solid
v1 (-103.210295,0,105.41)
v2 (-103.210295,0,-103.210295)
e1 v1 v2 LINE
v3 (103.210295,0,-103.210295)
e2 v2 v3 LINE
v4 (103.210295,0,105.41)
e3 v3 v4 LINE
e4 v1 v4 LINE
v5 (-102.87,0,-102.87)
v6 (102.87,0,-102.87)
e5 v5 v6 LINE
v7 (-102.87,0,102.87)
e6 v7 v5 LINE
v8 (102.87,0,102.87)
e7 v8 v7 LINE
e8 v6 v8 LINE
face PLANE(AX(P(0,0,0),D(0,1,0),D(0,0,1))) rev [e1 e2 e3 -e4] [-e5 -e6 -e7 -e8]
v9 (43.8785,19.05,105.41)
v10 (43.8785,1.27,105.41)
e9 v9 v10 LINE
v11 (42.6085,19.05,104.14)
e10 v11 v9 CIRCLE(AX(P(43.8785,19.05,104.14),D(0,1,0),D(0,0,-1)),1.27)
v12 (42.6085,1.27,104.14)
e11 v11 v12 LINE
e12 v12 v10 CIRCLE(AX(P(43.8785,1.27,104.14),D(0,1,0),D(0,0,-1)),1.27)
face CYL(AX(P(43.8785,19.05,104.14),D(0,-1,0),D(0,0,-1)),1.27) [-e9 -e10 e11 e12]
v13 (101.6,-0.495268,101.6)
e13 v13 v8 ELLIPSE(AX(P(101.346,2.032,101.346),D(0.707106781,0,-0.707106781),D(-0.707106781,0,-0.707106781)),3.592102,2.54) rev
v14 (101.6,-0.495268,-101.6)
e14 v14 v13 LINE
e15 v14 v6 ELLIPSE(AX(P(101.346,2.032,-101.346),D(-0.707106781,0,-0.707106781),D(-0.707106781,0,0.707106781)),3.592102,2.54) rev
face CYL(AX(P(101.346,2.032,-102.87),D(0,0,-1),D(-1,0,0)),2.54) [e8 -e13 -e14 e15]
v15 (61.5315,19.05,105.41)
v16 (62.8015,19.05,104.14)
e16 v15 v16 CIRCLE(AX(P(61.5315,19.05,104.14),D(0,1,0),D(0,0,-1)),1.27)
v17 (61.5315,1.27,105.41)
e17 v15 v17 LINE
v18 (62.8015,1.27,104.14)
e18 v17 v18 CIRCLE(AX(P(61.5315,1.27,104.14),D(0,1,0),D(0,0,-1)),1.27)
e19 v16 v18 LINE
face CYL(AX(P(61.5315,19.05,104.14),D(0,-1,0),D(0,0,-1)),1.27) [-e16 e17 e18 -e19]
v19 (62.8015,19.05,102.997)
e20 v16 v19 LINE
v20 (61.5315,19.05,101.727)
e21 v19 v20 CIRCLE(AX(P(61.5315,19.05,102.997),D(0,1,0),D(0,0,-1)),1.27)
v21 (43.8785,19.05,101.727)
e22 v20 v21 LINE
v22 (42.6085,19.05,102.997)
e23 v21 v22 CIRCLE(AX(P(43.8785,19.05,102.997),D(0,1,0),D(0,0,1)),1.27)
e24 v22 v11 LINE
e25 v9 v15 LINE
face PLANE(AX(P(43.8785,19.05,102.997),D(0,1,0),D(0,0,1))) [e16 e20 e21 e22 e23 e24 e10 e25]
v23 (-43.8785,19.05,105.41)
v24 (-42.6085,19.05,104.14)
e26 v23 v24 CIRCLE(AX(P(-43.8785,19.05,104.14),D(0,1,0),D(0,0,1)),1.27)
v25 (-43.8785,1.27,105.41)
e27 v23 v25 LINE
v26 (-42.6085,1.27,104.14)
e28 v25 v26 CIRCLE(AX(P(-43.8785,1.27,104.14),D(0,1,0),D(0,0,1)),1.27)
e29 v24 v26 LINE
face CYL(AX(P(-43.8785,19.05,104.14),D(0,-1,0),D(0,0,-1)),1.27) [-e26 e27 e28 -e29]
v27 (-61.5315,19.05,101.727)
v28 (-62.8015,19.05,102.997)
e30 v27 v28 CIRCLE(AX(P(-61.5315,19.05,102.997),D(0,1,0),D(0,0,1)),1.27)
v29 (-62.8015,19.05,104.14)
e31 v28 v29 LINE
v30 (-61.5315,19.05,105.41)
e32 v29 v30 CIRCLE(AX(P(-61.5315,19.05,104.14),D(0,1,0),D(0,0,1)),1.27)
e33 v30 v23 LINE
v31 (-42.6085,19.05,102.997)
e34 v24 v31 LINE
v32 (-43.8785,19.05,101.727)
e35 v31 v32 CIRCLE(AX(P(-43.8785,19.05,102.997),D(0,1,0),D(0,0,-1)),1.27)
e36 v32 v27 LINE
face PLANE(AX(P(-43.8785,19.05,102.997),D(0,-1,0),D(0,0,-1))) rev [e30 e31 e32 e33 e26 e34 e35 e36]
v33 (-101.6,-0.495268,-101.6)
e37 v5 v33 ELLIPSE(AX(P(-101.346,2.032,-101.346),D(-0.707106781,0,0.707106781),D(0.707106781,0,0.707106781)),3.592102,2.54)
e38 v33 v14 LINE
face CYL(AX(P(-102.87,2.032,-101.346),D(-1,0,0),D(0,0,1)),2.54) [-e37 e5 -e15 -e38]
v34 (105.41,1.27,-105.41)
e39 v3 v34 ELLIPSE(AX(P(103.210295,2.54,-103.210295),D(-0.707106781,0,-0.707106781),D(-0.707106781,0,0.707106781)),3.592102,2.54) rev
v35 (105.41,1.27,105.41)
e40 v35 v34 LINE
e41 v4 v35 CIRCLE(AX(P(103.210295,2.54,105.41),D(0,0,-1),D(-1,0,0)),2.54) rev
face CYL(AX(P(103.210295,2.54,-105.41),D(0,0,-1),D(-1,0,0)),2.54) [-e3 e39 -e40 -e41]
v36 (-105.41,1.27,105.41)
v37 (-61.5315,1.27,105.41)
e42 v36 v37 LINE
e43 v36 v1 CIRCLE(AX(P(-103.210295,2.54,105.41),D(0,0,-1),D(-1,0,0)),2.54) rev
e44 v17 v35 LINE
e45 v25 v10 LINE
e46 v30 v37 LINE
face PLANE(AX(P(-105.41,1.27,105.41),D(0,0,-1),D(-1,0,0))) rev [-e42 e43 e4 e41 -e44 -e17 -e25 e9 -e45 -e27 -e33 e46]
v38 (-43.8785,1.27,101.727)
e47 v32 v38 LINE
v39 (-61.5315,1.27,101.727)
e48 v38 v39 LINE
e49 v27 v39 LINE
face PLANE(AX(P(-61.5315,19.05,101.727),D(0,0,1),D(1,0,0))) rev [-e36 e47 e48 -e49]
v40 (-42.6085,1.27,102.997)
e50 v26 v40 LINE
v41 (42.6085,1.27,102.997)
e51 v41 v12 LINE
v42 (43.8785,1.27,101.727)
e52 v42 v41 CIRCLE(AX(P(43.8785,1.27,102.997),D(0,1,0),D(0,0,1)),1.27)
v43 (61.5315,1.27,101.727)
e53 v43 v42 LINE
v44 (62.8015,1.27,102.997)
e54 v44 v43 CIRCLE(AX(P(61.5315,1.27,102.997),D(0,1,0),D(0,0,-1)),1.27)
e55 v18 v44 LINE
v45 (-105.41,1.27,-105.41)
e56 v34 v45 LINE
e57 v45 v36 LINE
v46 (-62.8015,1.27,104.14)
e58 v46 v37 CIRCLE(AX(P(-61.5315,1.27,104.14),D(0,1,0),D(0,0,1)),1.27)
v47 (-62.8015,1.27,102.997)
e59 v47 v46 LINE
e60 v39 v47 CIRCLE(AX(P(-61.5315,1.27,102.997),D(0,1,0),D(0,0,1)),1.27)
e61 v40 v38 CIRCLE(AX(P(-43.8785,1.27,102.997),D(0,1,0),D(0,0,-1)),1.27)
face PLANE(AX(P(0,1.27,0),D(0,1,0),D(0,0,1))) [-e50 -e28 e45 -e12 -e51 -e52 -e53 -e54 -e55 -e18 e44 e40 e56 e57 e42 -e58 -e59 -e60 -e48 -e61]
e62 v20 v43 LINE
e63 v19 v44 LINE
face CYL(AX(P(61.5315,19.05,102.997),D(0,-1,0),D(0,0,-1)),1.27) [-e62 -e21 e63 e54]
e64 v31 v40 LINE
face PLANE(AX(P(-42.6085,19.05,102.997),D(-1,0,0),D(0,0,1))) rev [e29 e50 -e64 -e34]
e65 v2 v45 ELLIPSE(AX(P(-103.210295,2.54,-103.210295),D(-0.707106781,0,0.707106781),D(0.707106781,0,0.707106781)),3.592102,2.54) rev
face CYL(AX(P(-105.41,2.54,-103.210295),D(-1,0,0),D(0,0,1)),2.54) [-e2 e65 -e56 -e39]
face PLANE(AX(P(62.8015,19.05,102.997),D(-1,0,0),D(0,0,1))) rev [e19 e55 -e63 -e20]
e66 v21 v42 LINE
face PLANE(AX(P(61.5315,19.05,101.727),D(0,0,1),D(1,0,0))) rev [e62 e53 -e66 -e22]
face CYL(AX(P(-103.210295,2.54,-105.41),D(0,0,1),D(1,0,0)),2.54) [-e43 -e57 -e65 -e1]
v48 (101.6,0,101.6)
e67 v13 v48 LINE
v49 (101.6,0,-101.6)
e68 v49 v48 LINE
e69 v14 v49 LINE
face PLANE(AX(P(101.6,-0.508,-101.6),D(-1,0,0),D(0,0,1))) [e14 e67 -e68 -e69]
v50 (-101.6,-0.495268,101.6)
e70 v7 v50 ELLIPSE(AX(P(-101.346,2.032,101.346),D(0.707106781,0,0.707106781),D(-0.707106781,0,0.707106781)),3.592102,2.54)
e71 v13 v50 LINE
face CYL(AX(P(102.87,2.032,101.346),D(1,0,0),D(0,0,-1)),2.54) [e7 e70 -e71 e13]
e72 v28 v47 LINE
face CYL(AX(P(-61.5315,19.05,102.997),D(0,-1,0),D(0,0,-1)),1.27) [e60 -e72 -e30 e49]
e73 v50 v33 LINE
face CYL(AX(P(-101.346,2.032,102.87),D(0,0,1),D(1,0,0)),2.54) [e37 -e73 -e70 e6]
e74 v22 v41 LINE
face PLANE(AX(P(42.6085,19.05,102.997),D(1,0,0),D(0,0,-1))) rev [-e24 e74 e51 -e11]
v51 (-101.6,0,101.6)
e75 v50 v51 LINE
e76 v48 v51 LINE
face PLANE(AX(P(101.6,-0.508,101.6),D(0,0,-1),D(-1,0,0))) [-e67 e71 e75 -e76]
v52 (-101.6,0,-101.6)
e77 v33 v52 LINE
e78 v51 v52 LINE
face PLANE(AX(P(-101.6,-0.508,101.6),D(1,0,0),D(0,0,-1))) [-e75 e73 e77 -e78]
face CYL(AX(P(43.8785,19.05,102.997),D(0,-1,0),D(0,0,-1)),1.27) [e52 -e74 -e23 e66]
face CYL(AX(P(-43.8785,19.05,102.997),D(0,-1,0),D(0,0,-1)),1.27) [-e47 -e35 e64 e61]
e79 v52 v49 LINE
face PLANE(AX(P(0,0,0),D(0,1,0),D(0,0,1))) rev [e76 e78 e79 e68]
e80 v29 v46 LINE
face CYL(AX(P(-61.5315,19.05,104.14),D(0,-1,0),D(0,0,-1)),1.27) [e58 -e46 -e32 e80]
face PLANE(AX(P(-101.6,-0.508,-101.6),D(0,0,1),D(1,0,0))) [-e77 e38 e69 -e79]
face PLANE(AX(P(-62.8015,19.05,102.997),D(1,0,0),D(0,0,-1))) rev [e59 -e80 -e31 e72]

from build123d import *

# Parameters (mm, degrees)
SKETCH1_W           = 210.82
SKETCH1_H           = 210.82
BOSS_EXTRUDE1_DEPTH = 1.27
BOSS_EXTRUDE2_DEPTH = 17.78
SKETCH3_W           = 205.74
SKETCH3_H           = 205.74
SKETCH3_W_2         = 203.2
SKETCH3_H_2         = 203.2
BOSS_EXTRUDE3_DEPTH = 0.508
FILLET1_R           = 2.54
FILLET2_R           = 2.54


with BuildPart() as part:
    # Sketch1 → Boss-Extrude1 (new body)
    with BuildSketch(Plane(origin=(0, 0, 0), x_dir=(1, 0, 0), z_dir=(0, 1, 0))):
        Rectangle(SKETCH1_W, SKETCH1_H)
    extrude(amount=BOSS_EXTRUDE1_DEPTH)

    # Sketch2 → Boss-Extrude2 (add)
    with BuildSketch(Plane(origin=(0, 1.27, 0), x_dir=(1, 0, 0), z_dir=(0, 1, 0))):
        with BuildLine():
            Line((42.6085, -102.997), (42.6085, -104.14))
            ThreePointArc((42.6085, -104.14), (42.980474388, -105.038025612), (43.8785, -105.41))
            Line((43.8785, -105.41), (61.5315, -105.41))
            ThreePointArc((61.5315, -105.41), (62.429525612, -105.038025612), (62.8015, -104.14))
            Line((62.8015, -104.14), (62.8015, -102.997))
            ThreePointArc((62.8015, -102.997), (62.429525612, -102.098974388), (61.5315, -101.727))
            Line((61.5315, -101.727), (43.8785, -101.727))
            ThreePointArc((43.8785, -101.727), (42.980474388, -102.098974388), (42.6085, -102.997))
        make_face()
        with BuildLine():
            Line((-61.5315, -101.727), (-43.8785, -101.727))
            ThreePointArc((-43.8785, -101.727), (-42.980474388, -102.098974388), (-42.6085, -102.997))
            Line((-42.6085, -102.997), (-42.6085, -104.14))
            ThreePointArc((-42.6085, -104.14), (-42.980474388, -105.038025612), (-43.8785, -105.41))
            Line((-43.8785, -105.41), (-61.5315, -105.41))
            ThreePointArc((-61.5315, -105.41), (-62.429525612, -105.038025612), (-62.8015, -104.14))
            Line((-62.8015, -104.14), (-62.8015, -102.997))
            ThreePointArc((-62.8015, -102.997), (-62.429525612, -102.098974388), (-61.5315, -101.727))
        make_face()
    extrude(amount=BOSS_EXTRUDE2_DEPTH)

    # Sketch3 → Boss-Extrude3 (add)
    with BuildSketch(Plane.XZ):
        Rectangle(SKETCH3_W, SKETCH3_H)
        Rectangle(SKETCH3_W_2, SKETCH3_H_2, mode=Mode.SUBTRACT)
    extrude(amount=BOSS_EXTRUDE3_DEPTH)

    # Fillet1
    # the kernel refuses this fillet: 2.54 mm, written as the material it takes off along each edge
    with BuildSketch(Plane(origin=(105.41, 0, -110.909261314), x_dir=(0, 1, 0), z_dir=(0, 0, 1)), Plane(origin=(-110.909261314, 0, -105.41), x_dir=(0, 1, 0), z_dir=(1, 0, 0)), Plane(origin=(-105.41, 0, 110.909261314), x_dir=(0, 1, 0), z_dir=(0, 0, -1))) as fillet1_piece_1:
        with BuildLine():
            CenterArc((2.54, 2.199704526), FILLET1_R, 180, 60)
            Line((0, 2.199704526), (-0.0508, 2.199704526))
            Line((-0.0508, 2.199704526), (-0.0508, 0))
            Line((-0.0508, 0), (0, -0.0508))
            ThreePointArc((0, -0.0508), (0.635, -0.0508), (1.2446, -0.043994091))
            Line((1.2446, -0.043994091), (1.27, 0))
        make_face()
    extrude(amount=221.818522628, mode=Mode.SUBTRACT)

    # Fillet2
    # the kernel refuses this fillet: 2.54 mm, written as the material it takes off along each edge
    with BuildSketch(Plane(origin=(106.68, -0.508, 102.87), x_dir=(0, 1, 0), z_dir=(-1, 0, 0)), Plane(origin=(102.87, -0.508, -106.68), x_dir=(0, 1, 0), z_dir=(0, 0, 1)), Plane(origin=(-106.68, -0.508, -102.87), x_dir=(0, 1, 0), z_dir=(1, 0, 0)), Plane(origin=(-102.87, -0.508, 106.68), x_dir=(0, 1, 0), z_dir=(0, 0, -1))) as fillet2_piece_1:
        with BuildLine():
            CenterArc((2.54, 1.524), FILLET2_R, 180, 36.869897646)
            Line((0, 1.524), (-0.0508, 1.524))
            Line((-0.0508, 1.524), (-0.0508, 0))
            Line((-0.0508, 0), (0, -0.0508))
            ThreePointArc((0, -0.0508), (0.254, -0.0508), (0.46736, -0.03048))
            Line((0.46736, -0.03048), (0.508, 0))
        make_face()
    extrude(amount=213.36, mode=Mode.SUBTRACT)


solid = part.part
